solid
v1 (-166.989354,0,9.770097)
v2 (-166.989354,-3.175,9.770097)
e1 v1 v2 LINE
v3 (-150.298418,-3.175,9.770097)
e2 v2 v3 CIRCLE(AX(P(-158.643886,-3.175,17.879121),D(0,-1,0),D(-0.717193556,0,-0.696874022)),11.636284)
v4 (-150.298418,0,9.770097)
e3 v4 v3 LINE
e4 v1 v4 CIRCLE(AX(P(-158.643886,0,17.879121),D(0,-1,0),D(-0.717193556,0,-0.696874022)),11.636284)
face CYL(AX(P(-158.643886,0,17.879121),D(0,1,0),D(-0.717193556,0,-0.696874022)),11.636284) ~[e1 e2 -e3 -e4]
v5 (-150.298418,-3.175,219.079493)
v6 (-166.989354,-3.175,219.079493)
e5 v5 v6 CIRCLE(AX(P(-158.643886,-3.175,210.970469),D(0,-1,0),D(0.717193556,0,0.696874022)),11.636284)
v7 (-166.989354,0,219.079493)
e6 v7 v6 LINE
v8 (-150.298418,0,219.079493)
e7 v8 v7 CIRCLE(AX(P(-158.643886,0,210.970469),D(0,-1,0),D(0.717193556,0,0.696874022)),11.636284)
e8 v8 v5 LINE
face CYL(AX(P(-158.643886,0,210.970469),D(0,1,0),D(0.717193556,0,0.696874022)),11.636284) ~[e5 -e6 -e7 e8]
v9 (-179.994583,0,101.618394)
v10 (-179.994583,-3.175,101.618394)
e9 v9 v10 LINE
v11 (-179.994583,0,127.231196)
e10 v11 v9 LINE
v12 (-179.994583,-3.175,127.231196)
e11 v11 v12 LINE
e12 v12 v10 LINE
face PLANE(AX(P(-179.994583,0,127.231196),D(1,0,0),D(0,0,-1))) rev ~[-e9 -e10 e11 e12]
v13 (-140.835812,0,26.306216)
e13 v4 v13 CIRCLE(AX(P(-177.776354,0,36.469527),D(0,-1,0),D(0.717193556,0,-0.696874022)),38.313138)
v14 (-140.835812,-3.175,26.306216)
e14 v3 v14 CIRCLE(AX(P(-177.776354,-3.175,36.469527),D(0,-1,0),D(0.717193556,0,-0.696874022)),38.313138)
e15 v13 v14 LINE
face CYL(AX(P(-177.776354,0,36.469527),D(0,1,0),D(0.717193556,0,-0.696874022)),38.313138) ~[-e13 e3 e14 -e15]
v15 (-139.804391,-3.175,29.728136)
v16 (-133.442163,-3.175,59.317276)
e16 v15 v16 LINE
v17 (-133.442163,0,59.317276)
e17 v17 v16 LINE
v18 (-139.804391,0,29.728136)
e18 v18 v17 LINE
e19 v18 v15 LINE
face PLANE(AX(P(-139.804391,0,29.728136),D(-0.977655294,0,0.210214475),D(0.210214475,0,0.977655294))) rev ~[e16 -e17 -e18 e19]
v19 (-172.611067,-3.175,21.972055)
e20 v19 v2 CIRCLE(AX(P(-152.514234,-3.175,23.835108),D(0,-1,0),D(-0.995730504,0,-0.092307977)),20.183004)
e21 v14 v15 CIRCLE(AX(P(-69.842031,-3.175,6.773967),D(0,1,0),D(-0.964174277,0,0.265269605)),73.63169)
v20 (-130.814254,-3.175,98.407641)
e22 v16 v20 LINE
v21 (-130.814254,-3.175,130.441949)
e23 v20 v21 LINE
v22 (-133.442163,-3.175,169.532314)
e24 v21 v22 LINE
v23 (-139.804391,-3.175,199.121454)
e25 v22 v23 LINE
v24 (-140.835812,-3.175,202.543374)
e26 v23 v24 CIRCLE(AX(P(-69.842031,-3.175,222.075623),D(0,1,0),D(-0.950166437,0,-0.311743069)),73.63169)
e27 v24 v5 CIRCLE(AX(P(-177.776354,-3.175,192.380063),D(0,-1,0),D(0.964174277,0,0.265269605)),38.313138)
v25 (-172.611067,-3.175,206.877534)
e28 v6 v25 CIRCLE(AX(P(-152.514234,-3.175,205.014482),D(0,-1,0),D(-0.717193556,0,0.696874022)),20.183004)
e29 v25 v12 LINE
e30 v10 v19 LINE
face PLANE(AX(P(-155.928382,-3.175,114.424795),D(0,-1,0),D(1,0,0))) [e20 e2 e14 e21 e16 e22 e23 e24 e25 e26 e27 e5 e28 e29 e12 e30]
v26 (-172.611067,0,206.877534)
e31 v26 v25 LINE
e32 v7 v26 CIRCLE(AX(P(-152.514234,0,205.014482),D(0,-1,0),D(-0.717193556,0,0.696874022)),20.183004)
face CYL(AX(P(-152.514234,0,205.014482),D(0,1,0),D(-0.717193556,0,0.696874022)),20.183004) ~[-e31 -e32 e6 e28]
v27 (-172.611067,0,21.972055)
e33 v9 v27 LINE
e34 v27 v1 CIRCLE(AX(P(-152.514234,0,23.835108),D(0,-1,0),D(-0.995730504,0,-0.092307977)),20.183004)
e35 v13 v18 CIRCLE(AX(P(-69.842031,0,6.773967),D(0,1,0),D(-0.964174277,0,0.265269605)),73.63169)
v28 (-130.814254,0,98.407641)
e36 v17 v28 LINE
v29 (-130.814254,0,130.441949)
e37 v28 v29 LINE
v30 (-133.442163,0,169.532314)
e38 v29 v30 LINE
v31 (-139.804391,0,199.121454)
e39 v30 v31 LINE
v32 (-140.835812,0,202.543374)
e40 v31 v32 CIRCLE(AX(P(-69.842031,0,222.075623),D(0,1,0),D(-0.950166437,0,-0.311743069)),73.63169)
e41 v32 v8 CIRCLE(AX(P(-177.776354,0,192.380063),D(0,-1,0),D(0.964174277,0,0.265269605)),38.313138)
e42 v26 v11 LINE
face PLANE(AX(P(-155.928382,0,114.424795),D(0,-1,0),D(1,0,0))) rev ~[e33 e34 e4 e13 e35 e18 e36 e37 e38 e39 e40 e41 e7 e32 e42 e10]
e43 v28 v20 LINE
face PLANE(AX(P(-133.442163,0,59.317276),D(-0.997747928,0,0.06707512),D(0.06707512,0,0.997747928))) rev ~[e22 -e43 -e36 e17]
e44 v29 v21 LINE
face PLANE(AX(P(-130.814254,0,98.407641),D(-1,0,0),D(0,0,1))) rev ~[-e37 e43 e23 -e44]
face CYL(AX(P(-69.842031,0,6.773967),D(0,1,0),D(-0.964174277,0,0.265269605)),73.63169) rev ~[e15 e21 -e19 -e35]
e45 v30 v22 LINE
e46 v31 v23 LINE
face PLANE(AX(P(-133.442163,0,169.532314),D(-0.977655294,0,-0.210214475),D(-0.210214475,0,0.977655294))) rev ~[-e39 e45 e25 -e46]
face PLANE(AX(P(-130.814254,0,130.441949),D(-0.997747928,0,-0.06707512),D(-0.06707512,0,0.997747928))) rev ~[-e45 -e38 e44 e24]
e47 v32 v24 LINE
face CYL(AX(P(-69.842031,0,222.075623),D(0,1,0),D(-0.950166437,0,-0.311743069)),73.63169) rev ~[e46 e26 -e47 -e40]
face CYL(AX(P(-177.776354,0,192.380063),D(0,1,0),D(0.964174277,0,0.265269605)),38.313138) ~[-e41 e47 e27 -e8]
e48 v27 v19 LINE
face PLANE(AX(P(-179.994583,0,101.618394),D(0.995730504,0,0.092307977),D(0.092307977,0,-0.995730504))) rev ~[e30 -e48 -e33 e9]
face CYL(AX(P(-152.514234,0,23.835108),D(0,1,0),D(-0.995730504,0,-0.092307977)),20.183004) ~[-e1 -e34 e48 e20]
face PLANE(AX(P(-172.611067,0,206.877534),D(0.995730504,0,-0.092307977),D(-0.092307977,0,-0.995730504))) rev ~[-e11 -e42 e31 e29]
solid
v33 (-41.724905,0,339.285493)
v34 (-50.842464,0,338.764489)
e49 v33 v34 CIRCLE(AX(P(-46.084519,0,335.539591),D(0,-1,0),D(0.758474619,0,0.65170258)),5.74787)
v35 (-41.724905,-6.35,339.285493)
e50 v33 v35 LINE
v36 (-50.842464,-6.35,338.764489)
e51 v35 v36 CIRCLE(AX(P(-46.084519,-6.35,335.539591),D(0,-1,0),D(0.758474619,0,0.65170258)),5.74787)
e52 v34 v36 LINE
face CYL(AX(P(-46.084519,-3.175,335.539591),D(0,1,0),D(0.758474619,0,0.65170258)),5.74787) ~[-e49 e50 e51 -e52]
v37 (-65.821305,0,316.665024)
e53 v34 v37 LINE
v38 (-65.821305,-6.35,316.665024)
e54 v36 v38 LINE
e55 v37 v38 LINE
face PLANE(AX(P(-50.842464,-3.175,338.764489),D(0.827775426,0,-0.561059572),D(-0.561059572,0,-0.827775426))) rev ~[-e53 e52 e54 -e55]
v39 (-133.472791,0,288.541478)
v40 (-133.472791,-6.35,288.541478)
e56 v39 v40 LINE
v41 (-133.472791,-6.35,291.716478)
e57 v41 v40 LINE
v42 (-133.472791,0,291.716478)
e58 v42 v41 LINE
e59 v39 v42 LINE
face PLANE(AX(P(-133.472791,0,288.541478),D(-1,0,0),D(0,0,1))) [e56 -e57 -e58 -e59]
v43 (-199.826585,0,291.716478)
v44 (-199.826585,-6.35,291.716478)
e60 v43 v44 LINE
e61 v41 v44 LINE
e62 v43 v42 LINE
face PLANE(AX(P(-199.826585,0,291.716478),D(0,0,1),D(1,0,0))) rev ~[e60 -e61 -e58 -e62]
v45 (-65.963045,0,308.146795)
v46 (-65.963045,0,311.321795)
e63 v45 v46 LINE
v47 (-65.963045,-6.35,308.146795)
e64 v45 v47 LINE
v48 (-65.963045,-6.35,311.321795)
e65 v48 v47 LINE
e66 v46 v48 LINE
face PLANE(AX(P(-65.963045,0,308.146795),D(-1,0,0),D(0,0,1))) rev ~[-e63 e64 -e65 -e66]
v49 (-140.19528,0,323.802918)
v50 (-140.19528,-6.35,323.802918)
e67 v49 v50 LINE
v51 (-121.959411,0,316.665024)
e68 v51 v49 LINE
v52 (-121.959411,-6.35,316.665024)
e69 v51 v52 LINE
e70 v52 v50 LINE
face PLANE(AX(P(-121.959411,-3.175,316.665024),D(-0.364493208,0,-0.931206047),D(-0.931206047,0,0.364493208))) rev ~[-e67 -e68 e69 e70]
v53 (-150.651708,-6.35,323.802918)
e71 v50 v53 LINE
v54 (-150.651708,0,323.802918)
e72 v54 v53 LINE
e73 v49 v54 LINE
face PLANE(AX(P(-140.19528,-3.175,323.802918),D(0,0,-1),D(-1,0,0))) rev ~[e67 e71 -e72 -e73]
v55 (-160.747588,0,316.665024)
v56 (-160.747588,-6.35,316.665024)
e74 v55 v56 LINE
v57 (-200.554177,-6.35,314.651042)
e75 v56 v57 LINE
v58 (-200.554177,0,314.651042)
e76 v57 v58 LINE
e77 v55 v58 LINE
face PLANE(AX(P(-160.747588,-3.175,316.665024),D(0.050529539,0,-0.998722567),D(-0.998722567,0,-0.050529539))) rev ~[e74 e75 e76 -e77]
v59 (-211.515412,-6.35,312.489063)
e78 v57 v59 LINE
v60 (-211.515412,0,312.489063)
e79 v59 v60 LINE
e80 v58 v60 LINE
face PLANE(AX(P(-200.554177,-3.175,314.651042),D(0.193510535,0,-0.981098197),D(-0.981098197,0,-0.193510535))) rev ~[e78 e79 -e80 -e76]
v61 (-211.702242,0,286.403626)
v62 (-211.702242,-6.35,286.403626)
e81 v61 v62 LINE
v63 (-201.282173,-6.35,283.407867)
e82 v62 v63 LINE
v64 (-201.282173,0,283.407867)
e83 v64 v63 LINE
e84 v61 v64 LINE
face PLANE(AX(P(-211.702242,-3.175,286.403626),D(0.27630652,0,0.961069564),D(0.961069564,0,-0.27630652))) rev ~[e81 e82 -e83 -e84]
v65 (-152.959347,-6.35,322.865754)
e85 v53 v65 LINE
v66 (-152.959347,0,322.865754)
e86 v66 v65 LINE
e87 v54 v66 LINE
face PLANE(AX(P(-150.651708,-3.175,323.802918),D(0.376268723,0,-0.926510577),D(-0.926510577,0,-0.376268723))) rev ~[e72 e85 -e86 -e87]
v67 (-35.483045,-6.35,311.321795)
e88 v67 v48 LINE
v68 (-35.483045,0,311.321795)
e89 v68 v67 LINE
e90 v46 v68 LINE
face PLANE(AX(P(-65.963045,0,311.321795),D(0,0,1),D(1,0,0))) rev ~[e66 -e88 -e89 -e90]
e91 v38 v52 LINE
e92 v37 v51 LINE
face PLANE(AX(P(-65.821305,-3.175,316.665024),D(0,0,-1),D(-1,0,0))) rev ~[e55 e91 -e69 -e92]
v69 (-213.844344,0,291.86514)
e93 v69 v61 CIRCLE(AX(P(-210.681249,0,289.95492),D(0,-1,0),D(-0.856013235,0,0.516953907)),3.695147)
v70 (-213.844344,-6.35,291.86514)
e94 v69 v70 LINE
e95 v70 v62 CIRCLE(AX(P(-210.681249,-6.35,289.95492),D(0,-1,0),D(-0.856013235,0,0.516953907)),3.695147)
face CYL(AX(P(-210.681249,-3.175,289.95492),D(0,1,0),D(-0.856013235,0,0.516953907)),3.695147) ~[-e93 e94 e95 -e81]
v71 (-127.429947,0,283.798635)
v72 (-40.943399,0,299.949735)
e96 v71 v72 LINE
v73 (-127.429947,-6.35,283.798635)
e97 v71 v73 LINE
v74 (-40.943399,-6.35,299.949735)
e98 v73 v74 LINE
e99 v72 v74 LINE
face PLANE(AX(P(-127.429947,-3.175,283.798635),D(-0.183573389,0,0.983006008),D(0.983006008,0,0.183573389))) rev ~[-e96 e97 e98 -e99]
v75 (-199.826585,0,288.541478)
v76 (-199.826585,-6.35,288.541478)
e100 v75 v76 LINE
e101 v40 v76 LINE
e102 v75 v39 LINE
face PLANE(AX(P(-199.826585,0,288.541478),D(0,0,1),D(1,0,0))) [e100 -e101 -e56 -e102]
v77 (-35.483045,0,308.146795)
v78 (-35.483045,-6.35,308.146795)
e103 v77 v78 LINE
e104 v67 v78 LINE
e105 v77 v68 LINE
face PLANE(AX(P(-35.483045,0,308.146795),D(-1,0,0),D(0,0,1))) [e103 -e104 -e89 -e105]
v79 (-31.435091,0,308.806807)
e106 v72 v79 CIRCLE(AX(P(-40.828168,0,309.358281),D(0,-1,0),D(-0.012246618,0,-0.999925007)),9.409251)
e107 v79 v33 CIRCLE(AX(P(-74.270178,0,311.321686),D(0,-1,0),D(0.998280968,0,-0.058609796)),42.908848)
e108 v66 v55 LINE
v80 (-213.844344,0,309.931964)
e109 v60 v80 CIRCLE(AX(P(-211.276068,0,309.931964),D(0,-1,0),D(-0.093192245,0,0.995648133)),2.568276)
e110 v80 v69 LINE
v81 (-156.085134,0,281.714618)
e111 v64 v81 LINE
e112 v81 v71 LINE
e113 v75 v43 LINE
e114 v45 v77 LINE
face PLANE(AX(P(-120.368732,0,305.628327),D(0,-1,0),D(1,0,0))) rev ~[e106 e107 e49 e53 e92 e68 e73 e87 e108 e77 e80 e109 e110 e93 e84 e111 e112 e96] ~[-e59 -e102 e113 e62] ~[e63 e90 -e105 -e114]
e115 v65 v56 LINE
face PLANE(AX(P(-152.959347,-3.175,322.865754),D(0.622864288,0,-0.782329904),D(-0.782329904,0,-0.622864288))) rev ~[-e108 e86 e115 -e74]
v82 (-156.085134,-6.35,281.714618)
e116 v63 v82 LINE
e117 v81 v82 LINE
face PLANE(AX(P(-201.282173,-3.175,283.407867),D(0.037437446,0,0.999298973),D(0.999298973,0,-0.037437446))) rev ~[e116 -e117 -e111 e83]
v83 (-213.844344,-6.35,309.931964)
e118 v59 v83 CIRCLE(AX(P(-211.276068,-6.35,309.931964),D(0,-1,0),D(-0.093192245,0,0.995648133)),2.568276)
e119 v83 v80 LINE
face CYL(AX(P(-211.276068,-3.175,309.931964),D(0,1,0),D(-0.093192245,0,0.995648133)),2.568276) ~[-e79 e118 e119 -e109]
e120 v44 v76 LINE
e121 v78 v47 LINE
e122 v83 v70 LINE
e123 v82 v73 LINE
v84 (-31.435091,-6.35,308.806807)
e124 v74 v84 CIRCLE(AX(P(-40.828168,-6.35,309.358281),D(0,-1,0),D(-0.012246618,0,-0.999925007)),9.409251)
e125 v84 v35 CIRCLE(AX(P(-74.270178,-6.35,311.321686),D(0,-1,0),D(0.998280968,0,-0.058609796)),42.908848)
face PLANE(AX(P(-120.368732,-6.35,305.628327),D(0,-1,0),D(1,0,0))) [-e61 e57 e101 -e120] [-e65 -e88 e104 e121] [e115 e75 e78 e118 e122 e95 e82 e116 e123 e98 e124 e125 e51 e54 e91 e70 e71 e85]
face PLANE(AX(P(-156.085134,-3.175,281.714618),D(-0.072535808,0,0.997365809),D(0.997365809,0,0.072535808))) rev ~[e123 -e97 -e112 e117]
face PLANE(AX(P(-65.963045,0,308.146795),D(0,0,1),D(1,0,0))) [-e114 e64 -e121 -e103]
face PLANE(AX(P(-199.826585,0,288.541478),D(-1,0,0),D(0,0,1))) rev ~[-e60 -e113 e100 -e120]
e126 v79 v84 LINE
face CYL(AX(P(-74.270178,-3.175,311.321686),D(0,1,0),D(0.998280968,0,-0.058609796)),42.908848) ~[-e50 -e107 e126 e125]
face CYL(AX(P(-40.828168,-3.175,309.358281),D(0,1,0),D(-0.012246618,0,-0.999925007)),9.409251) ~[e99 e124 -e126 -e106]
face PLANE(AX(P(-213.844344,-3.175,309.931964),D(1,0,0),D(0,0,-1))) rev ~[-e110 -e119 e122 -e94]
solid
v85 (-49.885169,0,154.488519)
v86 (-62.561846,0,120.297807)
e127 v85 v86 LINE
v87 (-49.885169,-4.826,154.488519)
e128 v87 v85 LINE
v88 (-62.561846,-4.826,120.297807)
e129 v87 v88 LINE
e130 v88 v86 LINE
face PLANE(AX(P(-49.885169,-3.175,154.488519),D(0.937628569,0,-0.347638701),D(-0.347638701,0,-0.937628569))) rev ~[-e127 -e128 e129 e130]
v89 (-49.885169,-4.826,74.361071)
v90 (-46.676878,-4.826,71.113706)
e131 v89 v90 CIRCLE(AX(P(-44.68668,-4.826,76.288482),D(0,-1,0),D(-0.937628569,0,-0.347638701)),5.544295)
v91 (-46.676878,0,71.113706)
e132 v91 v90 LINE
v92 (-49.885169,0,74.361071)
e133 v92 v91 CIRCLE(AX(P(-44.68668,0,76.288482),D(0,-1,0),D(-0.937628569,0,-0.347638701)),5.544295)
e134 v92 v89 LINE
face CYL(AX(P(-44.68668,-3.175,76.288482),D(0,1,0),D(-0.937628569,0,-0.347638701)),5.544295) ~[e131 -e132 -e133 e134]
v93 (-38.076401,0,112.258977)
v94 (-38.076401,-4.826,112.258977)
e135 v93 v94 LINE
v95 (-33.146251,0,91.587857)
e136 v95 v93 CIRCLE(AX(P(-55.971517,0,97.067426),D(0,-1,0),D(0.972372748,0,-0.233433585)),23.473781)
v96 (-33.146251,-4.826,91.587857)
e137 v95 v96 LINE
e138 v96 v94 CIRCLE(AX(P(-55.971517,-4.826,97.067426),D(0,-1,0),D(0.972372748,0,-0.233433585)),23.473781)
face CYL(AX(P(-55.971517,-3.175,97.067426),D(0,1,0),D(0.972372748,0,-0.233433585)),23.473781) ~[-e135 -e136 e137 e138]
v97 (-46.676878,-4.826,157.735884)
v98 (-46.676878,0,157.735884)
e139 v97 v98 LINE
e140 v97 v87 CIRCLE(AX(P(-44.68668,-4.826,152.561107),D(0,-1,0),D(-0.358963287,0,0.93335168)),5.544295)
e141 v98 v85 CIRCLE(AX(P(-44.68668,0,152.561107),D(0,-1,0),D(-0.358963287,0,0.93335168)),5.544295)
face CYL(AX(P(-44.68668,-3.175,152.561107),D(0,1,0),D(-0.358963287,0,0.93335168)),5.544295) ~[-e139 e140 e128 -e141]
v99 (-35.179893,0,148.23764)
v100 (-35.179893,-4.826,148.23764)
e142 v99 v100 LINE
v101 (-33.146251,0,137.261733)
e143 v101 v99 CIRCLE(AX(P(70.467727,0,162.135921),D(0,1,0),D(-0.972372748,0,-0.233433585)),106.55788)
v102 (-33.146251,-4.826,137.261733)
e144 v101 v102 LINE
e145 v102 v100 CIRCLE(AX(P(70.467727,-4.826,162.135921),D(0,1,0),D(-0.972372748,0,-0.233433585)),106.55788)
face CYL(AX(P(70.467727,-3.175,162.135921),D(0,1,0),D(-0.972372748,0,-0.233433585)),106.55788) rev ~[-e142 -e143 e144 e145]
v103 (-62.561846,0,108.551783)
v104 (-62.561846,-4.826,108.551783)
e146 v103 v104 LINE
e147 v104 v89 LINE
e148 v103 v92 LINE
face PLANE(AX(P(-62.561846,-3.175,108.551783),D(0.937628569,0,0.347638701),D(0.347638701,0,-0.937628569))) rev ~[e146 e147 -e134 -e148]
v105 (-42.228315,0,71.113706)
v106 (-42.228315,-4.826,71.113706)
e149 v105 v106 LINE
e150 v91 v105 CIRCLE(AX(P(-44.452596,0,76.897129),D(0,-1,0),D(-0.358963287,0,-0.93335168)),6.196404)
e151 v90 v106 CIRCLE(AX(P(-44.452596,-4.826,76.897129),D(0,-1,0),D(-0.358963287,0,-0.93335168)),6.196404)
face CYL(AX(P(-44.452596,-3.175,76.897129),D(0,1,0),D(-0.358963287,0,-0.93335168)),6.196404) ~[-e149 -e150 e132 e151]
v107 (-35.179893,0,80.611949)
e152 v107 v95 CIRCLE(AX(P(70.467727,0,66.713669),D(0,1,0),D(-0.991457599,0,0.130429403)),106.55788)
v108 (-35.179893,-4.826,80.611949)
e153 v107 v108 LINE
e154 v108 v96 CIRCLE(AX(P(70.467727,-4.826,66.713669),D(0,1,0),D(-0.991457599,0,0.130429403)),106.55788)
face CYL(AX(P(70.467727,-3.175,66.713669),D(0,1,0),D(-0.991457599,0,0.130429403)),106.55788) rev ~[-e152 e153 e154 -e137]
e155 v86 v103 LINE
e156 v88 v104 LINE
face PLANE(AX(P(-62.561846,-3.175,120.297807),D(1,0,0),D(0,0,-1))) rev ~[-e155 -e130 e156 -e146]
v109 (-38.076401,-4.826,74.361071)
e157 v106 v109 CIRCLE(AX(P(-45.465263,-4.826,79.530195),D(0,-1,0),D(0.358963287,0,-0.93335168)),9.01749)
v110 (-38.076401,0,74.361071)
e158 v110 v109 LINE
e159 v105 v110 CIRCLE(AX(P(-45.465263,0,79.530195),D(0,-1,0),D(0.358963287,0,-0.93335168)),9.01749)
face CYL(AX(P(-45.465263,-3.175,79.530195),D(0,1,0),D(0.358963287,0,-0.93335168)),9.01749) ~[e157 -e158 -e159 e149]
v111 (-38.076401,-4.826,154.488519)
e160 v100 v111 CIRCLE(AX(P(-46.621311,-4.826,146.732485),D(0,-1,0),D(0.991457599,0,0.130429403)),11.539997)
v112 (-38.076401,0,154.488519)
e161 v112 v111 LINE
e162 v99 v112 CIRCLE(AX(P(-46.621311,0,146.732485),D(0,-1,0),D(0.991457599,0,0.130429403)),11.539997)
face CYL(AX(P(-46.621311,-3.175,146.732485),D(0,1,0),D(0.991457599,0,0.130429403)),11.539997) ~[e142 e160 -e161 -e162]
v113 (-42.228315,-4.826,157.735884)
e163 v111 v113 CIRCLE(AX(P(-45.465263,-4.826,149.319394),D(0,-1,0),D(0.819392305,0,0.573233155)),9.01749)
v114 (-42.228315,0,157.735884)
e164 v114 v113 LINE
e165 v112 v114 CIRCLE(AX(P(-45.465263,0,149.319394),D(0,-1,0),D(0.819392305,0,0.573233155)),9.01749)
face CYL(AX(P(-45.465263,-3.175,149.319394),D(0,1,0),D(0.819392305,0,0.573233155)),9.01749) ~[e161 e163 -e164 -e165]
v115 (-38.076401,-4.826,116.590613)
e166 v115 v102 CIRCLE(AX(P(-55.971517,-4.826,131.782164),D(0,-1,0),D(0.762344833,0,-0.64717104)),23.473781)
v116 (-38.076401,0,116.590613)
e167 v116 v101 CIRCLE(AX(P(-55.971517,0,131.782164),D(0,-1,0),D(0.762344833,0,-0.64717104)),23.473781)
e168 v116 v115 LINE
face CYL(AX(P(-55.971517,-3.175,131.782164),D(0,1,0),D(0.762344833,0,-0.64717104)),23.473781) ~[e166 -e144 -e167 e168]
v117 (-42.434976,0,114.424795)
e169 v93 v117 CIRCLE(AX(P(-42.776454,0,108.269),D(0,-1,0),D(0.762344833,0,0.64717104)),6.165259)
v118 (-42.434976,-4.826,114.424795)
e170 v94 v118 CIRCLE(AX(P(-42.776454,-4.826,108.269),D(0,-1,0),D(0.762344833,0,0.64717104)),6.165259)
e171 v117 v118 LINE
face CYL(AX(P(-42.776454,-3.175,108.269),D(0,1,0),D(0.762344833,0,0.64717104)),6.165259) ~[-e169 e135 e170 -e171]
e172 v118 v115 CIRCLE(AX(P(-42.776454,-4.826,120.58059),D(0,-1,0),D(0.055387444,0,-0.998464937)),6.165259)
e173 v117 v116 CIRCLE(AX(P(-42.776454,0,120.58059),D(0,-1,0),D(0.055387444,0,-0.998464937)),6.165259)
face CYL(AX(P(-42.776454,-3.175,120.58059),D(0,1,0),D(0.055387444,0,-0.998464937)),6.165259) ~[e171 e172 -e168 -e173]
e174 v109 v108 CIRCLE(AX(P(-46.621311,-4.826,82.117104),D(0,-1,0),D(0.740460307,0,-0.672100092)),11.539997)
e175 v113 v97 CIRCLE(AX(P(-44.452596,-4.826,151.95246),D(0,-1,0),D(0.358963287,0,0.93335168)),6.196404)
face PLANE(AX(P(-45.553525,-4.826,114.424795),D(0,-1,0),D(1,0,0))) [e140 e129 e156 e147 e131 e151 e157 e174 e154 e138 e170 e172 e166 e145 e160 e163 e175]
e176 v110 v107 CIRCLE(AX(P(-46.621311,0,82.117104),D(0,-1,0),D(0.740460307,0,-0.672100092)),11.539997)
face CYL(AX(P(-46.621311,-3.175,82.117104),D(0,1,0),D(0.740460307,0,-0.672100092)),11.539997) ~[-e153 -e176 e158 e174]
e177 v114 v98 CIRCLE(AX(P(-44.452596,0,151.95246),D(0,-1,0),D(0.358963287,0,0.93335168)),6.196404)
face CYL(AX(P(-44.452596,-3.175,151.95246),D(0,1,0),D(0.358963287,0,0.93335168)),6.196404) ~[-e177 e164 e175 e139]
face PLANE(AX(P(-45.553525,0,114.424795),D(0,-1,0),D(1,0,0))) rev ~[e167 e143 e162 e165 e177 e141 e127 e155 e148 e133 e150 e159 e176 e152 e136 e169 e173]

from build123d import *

# Parameters (mm, degrees)
F2_DEPTH = 3.175
F3_DEPTH = 3.175
F4_W     = 66.3537942724
F4_H     = 3.175
F4_W_2   = 30.48
F5_DEPTH = 6.351
F6_DEPTH = 1.651


# Not quite as in the source:
# - a length typed as a fraction of an inch, garbled in the dataset ("3 / 203.2 mm" for 3/8 in), is restored


with BuildPart() as f2:
    # F1 (on Front) → F2 (new body)
    with BuildSketch(Plane.XZ):
        with BuildLine():
            Line((-172.6110667898, 206.8775344049), (-179.9945831299, 127.231195569))
            Line((-179.9945831299, 127.231195569), (-179.9945831299, 114.4247949123))
            Line((-179.9945831299, 114.4247949123), (-179.9945831299, 101.6183942556))
            Line((-179.9945831299, 101.6183942556), (-172.6110667898, 21.9720554197))
            ThreePointArc((-172.6110667898, 21.9720554197), (-170.845271575, 15.3895933308), (-166.9893544961, 9.7700966119))
            ThreePointArc((-166.9893544961, 9.7700966119), (-158.643886447, 6.2428365844), (-150.2984183978, 9.7700966119))
            ThreePointArc((-150.2984183978, 9.7700966119), (-144.5228447898, 17.4405844589), (-140.8358120402, 26.3062160673))
            ThreePointArc((-140.8358120402, 26.3062160673), (-140.3408665737, 28.0234348127), (-139.8043911336, 29.7281357651))
            Line((-139.8043911336, 29.7281357651), (-133.4421634674, 59.3172758818))
            Line((-133.4421634674, 59.3172758818), (-130.8142542839, 98.4076410532))
            Line((-130.8142542839, 98.4076410532), (-130.8142542839, 114.4247949123))
            Line((-130.8142542839, 114.4247949123), (-130.8142542839, 130.4419487715))
            Line((-130.8142542839, 130.4419487715), (-133.4421634674, 169.5323139429))
            Line((-133.4421634674, 169.5323139429), (-139.8043911336, 199.1214540596))
            ThreePointArc((-139.8043911336, 199.1214540596), (-140.3408665737, 200.8261550119), (-140.8358120402, 202.5433737574))
            ThreePointArc((-140.8358120402, 202.5433737574), (-144.5228447898, 211.4090053658), (-150.2984183978, 219.0794932127))
            ThreePointArc((-150.2984183978, 219.0794932127), (-158.643886447, 222.6067532402), (-166.9893544961, 219.0794932127))
            ThreePointArc((-166.9893544961, 219.0794932127), (-170.845271575, 213.4599964938), (-172.6110667898, 206.8775344049))
        make_face()
    extrude(amount=F2_DEPTH)


with BuildPart() as f2b:
    # F1 (on Front) → F2, piece 2 (new body)
    with BuildSketch(Plane.XZ):
        with BuildLine():
            Line((-213.8443440199, 309.9319636822), (-213.8443440199, 291.8651401997))
            ThreePointArc((-213.8443440199, 291.8651401997), (-214.1212611685, 288.6056865576), (-211.7022424936, 286.4036262035))
            Line((-211.7022424936, 286.4036262035), (-201.2821733952, 283.4078669548))
            Line((-201.2821733952, 283.4078669548), (-156.0851335526, 281.714618206))
            Line((-156.0851335526, 281.714618206), (-127.429947257, 283.798635006))
            Line((-127.429947257, 283.798635006), (-40.9433990717, 299.9497354031))
            ThreePointArc((-40.9433990717, 299.9497354031), (-34.41478075, 302.4733352076), (-31.4350910485, 308.8068068027))
            ThreePointArc((-31.4350910485, 308.8068068027), (-33.6156920244, 325.0469200325), (-41.7249053717, 339.285492897))
            ThreePointArc((-41.7249053717, 339.285492897), (-46.4124339616, 341.278099702), (-50.8424639702, 338.7644886971))
            Line((-50.8424639702, 338.7644886971), (-65.8213049173, 316.6650235653))
            Line((-65.8213049173, 316.6650235653), (-121.9594106078, 316.6650235653))
            Line((-121.9594106078, 316.6650235653), (-140.1952803135, 323.8029181957))
            Line((-140.1952803135, 323.8029181957), (-150.6517082453, 323.8029181957))
            Line((-150.6517082453, 323.8029181957), (-152.9593467712, 322.8657543659))
            Line((-152.9593467712, 322.8657543659), (-160.7475876808, 316.6650235653))
            Line((-160.7475876808, 316.6650235653), (-200.554177165, 314.651042223))
            Line((-200.554177165, 314.651042223), (-211.5154117346, 312.4890625477))
            ThreePointArc((-211.5154117346, 312.4890625477), (-213.174849499, 311.6613190677), (-213.8443440199, 309.9319636822))
        make_face()
    extrude(amount=F2_DEPTH)

    # F3 (add): a face of the model
    f3_faces = [f2b.faces().sort_by_distance(p)[0] for p in [
        (-124.5842443217, -3.175, 304.2983822932),
    ]]
    extrude(f3_faces, amount=F3_DEPTH)

    # F4 (on Front) → F5 (cut, through all)
    with BuildSketch(Plane.XZ):
        with Locations((-166.6496883212, 290.1289781431)):
            Rectangle(F4_W, F4_H)
        with Locations((-50.7230447626, 309.7342949867)):
            Rectangle(F4_W_2, F4_H)
    extrude(amount=F5_DEPTH, mode=Mode.SUBTRACT)


with BuildPart() as f2c:
    # F1 (on Front) → F2, piece 3 (new body)
    with BuildSketch(Plane.XZ):
        with BuildLine():
            Line((-62.5618458308, 120.2978070905), (-62.5618458308, 114.4247949123))
            Line((-62.5618458308, 114.4247949123), (-62.5618458308, 108.5517827342))
            Line((-62.5618458308, 108.5517827342), (-49.8851687327, 74.3610709906))
            ThreePointArc((-49.8851687327, 74.3610709906), (-48.6307450368, 72.3918746751), (-46.6768778861, 71.1137056351))
            ThreePointArc((-46.6768778861, 71.1137056351), (-44.4525964558, 70.7007257405), (-42.2283150256, 71.1137056351))
            ThreePointArc((-42.2283150256, 71.1137056351), (-39.9097876721, 72.4272505107), (-38.0764007568, 74.3610709906))
            ThreePointArc((-38.0764007568, 74.3610709906), (-36.150795106, 77.2653168267), (-35.1798926376, 80.6119493724))
            ThreePointArc((-35.1798926376, 80.6119493724), (-34.3068965337, 86.1265511206), (-33.1462513848, 91.5878565943))
            ThreePointArc((-33.1462513848, 91.5878565943), (-33.1381821173, 102.5132721235), (-38.0764007568, 112.2589771398))
            ThreePointArc((-38.0764007568, 112.2589771398), (-40.0329250575, 113.7901835089), (-42.4349759833, 114.4247949123))
            ThreePointArc((-42.4349759833, 114.4247949123), (-40.0329250575, 115.0594063158), (-38.0764007568, 116.5906126849))
            ThreePointArc((-38.0764007568, 116.5906126849), (-33.1381821173, 126.3363177012), (-33.1462513848, 137.2617332304))
            ThreePointArc((-33.1462513848, 137.2617332304), (-34.3068965337, 142.7230387041), (-35.1798926376, 148.2376404523))
            ThreePointArc((-35.1798926376, 148.2376404523), (-36.150795106, 151.584272998), (-38.0764007568, 154.4885188341))
            ThreePointArc((-38.0764007568, 154.4885188341), (-39.9097876721, 156.4223393139), (-42.2283150256, 157.7358841896))
            ThreePointArc((-42.2283150256, 157.7358841896), (-44.4525964558, 158.1488640842), (-46.6768778861, 157.7358841896))
            ThreePointArc((-46.6768778861, 157.7358841896), (-48.6307450368, 156.4577151496), (-49.8851687327, 154.4885188341))
            Line((-49.8851687327, 154.4885188341), (-62.5618458308, 120.2978070905))
        make_face()
    extrude(amount=F2_DEPTH)

    # F6 (add): a face of the model
    f6_faces = [f2c.faces().sort_by_distance(p)[0] for p in [
        (-46.1187241122, -3.175, 114.4247949123),
    ]]
    extrude(f6_faces, amount=F6_DEPTH)


solid = Compound([f2.part, f2b.part, f2c.part])
